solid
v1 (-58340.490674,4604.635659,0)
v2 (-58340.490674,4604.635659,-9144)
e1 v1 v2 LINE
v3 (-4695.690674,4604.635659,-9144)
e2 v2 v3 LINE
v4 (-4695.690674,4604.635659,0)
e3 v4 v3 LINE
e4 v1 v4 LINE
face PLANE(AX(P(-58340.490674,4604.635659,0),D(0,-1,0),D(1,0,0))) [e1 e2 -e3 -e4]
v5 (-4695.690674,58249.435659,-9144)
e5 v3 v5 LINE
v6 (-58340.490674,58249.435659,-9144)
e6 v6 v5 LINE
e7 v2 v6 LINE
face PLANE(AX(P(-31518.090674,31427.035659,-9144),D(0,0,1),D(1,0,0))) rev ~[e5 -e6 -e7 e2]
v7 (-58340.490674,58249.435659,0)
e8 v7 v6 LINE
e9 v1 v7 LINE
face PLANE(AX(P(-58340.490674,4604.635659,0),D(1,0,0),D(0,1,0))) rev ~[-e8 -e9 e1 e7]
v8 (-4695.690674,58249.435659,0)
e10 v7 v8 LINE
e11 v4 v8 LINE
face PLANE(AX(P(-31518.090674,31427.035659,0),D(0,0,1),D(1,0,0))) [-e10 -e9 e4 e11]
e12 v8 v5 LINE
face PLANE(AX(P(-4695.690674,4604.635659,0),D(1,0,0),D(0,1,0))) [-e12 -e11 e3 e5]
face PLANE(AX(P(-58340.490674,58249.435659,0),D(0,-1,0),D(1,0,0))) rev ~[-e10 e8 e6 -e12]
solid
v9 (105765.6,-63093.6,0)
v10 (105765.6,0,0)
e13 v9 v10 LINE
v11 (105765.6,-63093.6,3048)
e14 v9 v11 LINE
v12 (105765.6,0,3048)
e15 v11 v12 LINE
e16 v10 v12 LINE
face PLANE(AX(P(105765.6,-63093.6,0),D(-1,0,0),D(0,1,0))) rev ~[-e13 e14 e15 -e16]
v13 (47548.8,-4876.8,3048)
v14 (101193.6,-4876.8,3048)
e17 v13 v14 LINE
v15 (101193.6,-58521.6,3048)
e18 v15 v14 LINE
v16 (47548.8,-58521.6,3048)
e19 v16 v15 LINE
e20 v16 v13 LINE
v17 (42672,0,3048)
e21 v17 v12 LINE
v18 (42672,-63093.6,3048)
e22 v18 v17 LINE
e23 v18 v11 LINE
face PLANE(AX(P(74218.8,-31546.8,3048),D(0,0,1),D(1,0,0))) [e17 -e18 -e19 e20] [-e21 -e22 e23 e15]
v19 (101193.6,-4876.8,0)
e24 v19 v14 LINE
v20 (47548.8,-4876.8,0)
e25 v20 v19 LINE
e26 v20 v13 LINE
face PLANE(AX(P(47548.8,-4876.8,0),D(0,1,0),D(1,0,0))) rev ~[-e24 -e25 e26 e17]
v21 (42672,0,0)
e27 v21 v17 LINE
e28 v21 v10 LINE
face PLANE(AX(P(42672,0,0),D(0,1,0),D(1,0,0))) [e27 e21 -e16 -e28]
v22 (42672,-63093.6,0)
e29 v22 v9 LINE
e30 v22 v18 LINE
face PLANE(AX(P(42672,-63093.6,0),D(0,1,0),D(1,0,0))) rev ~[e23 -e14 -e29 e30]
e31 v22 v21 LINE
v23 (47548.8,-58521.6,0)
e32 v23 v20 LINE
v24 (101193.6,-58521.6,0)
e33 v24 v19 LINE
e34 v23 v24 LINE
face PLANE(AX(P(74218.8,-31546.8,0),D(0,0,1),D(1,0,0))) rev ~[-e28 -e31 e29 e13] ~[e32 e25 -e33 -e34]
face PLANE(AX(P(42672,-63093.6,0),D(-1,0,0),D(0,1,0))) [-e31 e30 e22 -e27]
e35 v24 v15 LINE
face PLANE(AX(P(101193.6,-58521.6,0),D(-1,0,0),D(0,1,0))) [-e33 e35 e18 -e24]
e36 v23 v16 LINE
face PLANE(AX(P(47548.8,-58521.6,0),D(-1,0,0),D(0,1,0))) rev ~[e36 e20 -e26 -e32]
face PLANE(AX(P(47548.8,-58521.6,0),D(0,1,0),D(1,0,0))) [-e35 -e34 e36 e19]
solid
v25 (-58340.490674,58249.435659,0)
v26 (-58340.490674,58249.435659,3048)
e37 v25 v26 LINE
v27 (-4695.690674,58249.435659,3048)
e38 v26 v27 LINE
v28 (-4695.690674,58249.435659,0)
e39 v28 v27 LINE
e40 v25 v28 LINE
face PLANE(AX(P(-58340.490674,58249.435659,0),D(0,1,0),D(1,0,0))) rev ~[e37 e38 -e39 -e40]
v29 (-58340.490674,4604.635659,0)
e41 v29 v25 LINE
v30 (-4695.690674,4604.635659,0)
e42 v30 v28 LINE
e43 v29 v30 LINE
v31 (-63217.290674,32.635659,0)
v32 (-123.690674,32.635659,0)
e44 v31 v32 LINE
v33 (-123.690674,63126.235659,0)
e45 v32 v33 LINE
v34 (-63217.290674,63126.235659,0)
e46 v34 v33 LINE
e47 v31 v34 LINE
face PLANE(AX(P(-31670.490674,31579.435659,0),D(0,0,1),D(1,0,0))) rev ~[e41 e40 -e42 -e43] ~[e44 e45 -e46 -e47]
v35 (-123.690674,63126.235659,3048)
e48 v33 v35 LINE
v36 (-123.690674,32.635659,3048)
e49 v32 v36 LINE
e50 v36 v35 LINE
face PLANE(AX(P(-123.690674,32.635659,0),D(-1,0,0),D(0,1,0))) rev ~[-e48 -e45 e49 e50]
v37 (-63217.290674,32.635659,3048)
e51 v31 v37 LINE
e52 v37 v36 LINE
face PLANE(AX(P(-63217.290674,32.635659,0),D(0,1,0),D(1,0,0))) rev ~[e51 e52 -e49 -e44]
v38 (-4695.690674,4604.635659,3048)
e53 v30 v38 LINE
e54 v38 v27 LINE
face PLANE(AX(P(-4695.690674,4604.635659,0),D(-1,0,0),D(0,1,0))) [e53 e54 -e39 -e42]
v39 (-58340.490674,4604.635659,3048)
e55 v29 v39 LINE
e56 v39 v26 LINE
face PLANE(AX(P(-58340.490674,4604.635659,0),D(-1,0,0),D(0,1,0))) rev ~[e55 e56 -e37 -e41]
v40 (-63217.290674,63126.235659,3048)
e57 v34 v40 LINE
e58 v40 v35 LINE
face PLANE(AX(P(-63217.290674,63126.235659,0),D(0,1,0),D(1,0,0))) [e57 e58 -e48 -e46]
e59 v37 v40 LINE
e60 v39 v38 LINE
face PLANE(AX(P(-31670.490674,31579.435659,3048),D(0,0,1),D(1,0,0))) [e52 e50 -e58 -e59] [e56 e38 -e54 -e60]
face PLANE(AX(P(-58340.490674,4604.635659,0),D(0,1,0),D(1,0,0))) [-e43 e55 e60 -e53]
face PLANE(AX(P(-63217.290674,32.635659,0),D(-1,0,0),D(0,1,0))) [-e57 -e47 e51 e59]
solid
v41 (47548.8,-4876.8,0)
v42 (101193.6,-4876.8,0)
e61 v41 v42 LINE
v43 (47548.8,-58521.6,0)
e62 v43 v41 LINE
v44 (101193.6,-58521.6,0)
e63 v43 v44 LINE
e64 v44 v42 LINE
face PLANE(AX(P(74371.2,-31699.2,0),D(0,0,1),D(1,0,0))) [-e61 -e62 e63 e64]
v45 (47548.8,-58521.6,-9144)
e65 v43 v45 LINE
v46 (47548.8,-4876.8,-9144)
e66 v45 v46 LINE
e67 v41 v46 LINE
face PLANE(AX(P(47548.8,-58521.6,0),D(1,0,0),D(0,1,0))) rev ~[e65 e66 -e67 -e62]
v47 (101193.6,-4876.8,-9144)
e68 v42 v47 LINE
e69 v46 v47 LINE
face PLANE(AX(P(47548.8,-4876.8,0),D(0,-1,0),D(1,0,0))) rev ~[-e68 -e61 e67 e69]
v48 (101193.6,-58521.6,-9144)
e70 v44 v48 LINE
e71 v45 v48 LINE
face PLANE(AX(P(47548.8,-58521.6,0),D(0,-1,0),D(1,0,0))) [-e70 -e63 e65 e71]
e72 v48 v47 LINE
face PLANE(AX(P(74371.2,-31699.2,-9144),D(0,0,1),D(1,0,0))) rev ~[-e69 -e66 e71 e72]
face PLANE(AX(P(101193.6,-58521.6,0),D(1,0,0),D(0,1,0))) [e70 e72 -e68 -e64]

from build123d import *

# Parameters (mm, degrees)
F1_W     = 53644.8
F1_H     = 53644.8
F2_DEPTH = 9144
F1_W_2   = 63093.6
F1_H_2   = 63093.6
F3_DEPTH = 3048


# Not quite as in the source:
# - a feature names something its author has since deleted; it is built from what else it names


with BuildPart() as f2:
    # F1 (on face) → F2 (new body)
    with BuildSketch(Plane.XY):
        with Locations((-31518.0906738281, 31427.0356589794)):
            Rectangle(F1_W, F1_H)
    extrude(amount=-F2_DEPTH)


with BuildPart() as f2b:
    # F1 (on face) → F2, piece 2 (new body)
    with BuildSketch(Plane.XY):
        with Locations((74371.2, -31699.2)):
            Rectangle(F1_W, F1_H)
    extrude(amount=-F2_DEPTH)


with BuildPart() as f3:
    # F1 (on face) → F3 (new body)
    with BuildSketch(Plane.XY):
        with Locations((-31670.4906738281, 31579.4356589794)):
            Rectangle(F1_W_2, F1_H_2)
        with Locations((-31518.0906738281, 31427.0356589794)):
            Rectangle(F1_W, F1_H, mode=Mode.SUBTRACT)
    extrude(amount=F3_DEPTH)


with BuildPart() as f3b:
    # F1 (on face) → F3, piece 2 (new body)
    with BuildSketch(Plane.XY):
        with Locations((74218.8, -31546.8)):
            Rectangle(F1_W_2, F1_H_2)
        with Locations((74371.2, -31699.2)):
            Rectangle(F1_W, F1_H, mode=Mode.SUBTRACT)
    extrude(amount=F3_DEPTH)


solid = Compound([f2.part, f2b.part, f3.part, f3b.part])
